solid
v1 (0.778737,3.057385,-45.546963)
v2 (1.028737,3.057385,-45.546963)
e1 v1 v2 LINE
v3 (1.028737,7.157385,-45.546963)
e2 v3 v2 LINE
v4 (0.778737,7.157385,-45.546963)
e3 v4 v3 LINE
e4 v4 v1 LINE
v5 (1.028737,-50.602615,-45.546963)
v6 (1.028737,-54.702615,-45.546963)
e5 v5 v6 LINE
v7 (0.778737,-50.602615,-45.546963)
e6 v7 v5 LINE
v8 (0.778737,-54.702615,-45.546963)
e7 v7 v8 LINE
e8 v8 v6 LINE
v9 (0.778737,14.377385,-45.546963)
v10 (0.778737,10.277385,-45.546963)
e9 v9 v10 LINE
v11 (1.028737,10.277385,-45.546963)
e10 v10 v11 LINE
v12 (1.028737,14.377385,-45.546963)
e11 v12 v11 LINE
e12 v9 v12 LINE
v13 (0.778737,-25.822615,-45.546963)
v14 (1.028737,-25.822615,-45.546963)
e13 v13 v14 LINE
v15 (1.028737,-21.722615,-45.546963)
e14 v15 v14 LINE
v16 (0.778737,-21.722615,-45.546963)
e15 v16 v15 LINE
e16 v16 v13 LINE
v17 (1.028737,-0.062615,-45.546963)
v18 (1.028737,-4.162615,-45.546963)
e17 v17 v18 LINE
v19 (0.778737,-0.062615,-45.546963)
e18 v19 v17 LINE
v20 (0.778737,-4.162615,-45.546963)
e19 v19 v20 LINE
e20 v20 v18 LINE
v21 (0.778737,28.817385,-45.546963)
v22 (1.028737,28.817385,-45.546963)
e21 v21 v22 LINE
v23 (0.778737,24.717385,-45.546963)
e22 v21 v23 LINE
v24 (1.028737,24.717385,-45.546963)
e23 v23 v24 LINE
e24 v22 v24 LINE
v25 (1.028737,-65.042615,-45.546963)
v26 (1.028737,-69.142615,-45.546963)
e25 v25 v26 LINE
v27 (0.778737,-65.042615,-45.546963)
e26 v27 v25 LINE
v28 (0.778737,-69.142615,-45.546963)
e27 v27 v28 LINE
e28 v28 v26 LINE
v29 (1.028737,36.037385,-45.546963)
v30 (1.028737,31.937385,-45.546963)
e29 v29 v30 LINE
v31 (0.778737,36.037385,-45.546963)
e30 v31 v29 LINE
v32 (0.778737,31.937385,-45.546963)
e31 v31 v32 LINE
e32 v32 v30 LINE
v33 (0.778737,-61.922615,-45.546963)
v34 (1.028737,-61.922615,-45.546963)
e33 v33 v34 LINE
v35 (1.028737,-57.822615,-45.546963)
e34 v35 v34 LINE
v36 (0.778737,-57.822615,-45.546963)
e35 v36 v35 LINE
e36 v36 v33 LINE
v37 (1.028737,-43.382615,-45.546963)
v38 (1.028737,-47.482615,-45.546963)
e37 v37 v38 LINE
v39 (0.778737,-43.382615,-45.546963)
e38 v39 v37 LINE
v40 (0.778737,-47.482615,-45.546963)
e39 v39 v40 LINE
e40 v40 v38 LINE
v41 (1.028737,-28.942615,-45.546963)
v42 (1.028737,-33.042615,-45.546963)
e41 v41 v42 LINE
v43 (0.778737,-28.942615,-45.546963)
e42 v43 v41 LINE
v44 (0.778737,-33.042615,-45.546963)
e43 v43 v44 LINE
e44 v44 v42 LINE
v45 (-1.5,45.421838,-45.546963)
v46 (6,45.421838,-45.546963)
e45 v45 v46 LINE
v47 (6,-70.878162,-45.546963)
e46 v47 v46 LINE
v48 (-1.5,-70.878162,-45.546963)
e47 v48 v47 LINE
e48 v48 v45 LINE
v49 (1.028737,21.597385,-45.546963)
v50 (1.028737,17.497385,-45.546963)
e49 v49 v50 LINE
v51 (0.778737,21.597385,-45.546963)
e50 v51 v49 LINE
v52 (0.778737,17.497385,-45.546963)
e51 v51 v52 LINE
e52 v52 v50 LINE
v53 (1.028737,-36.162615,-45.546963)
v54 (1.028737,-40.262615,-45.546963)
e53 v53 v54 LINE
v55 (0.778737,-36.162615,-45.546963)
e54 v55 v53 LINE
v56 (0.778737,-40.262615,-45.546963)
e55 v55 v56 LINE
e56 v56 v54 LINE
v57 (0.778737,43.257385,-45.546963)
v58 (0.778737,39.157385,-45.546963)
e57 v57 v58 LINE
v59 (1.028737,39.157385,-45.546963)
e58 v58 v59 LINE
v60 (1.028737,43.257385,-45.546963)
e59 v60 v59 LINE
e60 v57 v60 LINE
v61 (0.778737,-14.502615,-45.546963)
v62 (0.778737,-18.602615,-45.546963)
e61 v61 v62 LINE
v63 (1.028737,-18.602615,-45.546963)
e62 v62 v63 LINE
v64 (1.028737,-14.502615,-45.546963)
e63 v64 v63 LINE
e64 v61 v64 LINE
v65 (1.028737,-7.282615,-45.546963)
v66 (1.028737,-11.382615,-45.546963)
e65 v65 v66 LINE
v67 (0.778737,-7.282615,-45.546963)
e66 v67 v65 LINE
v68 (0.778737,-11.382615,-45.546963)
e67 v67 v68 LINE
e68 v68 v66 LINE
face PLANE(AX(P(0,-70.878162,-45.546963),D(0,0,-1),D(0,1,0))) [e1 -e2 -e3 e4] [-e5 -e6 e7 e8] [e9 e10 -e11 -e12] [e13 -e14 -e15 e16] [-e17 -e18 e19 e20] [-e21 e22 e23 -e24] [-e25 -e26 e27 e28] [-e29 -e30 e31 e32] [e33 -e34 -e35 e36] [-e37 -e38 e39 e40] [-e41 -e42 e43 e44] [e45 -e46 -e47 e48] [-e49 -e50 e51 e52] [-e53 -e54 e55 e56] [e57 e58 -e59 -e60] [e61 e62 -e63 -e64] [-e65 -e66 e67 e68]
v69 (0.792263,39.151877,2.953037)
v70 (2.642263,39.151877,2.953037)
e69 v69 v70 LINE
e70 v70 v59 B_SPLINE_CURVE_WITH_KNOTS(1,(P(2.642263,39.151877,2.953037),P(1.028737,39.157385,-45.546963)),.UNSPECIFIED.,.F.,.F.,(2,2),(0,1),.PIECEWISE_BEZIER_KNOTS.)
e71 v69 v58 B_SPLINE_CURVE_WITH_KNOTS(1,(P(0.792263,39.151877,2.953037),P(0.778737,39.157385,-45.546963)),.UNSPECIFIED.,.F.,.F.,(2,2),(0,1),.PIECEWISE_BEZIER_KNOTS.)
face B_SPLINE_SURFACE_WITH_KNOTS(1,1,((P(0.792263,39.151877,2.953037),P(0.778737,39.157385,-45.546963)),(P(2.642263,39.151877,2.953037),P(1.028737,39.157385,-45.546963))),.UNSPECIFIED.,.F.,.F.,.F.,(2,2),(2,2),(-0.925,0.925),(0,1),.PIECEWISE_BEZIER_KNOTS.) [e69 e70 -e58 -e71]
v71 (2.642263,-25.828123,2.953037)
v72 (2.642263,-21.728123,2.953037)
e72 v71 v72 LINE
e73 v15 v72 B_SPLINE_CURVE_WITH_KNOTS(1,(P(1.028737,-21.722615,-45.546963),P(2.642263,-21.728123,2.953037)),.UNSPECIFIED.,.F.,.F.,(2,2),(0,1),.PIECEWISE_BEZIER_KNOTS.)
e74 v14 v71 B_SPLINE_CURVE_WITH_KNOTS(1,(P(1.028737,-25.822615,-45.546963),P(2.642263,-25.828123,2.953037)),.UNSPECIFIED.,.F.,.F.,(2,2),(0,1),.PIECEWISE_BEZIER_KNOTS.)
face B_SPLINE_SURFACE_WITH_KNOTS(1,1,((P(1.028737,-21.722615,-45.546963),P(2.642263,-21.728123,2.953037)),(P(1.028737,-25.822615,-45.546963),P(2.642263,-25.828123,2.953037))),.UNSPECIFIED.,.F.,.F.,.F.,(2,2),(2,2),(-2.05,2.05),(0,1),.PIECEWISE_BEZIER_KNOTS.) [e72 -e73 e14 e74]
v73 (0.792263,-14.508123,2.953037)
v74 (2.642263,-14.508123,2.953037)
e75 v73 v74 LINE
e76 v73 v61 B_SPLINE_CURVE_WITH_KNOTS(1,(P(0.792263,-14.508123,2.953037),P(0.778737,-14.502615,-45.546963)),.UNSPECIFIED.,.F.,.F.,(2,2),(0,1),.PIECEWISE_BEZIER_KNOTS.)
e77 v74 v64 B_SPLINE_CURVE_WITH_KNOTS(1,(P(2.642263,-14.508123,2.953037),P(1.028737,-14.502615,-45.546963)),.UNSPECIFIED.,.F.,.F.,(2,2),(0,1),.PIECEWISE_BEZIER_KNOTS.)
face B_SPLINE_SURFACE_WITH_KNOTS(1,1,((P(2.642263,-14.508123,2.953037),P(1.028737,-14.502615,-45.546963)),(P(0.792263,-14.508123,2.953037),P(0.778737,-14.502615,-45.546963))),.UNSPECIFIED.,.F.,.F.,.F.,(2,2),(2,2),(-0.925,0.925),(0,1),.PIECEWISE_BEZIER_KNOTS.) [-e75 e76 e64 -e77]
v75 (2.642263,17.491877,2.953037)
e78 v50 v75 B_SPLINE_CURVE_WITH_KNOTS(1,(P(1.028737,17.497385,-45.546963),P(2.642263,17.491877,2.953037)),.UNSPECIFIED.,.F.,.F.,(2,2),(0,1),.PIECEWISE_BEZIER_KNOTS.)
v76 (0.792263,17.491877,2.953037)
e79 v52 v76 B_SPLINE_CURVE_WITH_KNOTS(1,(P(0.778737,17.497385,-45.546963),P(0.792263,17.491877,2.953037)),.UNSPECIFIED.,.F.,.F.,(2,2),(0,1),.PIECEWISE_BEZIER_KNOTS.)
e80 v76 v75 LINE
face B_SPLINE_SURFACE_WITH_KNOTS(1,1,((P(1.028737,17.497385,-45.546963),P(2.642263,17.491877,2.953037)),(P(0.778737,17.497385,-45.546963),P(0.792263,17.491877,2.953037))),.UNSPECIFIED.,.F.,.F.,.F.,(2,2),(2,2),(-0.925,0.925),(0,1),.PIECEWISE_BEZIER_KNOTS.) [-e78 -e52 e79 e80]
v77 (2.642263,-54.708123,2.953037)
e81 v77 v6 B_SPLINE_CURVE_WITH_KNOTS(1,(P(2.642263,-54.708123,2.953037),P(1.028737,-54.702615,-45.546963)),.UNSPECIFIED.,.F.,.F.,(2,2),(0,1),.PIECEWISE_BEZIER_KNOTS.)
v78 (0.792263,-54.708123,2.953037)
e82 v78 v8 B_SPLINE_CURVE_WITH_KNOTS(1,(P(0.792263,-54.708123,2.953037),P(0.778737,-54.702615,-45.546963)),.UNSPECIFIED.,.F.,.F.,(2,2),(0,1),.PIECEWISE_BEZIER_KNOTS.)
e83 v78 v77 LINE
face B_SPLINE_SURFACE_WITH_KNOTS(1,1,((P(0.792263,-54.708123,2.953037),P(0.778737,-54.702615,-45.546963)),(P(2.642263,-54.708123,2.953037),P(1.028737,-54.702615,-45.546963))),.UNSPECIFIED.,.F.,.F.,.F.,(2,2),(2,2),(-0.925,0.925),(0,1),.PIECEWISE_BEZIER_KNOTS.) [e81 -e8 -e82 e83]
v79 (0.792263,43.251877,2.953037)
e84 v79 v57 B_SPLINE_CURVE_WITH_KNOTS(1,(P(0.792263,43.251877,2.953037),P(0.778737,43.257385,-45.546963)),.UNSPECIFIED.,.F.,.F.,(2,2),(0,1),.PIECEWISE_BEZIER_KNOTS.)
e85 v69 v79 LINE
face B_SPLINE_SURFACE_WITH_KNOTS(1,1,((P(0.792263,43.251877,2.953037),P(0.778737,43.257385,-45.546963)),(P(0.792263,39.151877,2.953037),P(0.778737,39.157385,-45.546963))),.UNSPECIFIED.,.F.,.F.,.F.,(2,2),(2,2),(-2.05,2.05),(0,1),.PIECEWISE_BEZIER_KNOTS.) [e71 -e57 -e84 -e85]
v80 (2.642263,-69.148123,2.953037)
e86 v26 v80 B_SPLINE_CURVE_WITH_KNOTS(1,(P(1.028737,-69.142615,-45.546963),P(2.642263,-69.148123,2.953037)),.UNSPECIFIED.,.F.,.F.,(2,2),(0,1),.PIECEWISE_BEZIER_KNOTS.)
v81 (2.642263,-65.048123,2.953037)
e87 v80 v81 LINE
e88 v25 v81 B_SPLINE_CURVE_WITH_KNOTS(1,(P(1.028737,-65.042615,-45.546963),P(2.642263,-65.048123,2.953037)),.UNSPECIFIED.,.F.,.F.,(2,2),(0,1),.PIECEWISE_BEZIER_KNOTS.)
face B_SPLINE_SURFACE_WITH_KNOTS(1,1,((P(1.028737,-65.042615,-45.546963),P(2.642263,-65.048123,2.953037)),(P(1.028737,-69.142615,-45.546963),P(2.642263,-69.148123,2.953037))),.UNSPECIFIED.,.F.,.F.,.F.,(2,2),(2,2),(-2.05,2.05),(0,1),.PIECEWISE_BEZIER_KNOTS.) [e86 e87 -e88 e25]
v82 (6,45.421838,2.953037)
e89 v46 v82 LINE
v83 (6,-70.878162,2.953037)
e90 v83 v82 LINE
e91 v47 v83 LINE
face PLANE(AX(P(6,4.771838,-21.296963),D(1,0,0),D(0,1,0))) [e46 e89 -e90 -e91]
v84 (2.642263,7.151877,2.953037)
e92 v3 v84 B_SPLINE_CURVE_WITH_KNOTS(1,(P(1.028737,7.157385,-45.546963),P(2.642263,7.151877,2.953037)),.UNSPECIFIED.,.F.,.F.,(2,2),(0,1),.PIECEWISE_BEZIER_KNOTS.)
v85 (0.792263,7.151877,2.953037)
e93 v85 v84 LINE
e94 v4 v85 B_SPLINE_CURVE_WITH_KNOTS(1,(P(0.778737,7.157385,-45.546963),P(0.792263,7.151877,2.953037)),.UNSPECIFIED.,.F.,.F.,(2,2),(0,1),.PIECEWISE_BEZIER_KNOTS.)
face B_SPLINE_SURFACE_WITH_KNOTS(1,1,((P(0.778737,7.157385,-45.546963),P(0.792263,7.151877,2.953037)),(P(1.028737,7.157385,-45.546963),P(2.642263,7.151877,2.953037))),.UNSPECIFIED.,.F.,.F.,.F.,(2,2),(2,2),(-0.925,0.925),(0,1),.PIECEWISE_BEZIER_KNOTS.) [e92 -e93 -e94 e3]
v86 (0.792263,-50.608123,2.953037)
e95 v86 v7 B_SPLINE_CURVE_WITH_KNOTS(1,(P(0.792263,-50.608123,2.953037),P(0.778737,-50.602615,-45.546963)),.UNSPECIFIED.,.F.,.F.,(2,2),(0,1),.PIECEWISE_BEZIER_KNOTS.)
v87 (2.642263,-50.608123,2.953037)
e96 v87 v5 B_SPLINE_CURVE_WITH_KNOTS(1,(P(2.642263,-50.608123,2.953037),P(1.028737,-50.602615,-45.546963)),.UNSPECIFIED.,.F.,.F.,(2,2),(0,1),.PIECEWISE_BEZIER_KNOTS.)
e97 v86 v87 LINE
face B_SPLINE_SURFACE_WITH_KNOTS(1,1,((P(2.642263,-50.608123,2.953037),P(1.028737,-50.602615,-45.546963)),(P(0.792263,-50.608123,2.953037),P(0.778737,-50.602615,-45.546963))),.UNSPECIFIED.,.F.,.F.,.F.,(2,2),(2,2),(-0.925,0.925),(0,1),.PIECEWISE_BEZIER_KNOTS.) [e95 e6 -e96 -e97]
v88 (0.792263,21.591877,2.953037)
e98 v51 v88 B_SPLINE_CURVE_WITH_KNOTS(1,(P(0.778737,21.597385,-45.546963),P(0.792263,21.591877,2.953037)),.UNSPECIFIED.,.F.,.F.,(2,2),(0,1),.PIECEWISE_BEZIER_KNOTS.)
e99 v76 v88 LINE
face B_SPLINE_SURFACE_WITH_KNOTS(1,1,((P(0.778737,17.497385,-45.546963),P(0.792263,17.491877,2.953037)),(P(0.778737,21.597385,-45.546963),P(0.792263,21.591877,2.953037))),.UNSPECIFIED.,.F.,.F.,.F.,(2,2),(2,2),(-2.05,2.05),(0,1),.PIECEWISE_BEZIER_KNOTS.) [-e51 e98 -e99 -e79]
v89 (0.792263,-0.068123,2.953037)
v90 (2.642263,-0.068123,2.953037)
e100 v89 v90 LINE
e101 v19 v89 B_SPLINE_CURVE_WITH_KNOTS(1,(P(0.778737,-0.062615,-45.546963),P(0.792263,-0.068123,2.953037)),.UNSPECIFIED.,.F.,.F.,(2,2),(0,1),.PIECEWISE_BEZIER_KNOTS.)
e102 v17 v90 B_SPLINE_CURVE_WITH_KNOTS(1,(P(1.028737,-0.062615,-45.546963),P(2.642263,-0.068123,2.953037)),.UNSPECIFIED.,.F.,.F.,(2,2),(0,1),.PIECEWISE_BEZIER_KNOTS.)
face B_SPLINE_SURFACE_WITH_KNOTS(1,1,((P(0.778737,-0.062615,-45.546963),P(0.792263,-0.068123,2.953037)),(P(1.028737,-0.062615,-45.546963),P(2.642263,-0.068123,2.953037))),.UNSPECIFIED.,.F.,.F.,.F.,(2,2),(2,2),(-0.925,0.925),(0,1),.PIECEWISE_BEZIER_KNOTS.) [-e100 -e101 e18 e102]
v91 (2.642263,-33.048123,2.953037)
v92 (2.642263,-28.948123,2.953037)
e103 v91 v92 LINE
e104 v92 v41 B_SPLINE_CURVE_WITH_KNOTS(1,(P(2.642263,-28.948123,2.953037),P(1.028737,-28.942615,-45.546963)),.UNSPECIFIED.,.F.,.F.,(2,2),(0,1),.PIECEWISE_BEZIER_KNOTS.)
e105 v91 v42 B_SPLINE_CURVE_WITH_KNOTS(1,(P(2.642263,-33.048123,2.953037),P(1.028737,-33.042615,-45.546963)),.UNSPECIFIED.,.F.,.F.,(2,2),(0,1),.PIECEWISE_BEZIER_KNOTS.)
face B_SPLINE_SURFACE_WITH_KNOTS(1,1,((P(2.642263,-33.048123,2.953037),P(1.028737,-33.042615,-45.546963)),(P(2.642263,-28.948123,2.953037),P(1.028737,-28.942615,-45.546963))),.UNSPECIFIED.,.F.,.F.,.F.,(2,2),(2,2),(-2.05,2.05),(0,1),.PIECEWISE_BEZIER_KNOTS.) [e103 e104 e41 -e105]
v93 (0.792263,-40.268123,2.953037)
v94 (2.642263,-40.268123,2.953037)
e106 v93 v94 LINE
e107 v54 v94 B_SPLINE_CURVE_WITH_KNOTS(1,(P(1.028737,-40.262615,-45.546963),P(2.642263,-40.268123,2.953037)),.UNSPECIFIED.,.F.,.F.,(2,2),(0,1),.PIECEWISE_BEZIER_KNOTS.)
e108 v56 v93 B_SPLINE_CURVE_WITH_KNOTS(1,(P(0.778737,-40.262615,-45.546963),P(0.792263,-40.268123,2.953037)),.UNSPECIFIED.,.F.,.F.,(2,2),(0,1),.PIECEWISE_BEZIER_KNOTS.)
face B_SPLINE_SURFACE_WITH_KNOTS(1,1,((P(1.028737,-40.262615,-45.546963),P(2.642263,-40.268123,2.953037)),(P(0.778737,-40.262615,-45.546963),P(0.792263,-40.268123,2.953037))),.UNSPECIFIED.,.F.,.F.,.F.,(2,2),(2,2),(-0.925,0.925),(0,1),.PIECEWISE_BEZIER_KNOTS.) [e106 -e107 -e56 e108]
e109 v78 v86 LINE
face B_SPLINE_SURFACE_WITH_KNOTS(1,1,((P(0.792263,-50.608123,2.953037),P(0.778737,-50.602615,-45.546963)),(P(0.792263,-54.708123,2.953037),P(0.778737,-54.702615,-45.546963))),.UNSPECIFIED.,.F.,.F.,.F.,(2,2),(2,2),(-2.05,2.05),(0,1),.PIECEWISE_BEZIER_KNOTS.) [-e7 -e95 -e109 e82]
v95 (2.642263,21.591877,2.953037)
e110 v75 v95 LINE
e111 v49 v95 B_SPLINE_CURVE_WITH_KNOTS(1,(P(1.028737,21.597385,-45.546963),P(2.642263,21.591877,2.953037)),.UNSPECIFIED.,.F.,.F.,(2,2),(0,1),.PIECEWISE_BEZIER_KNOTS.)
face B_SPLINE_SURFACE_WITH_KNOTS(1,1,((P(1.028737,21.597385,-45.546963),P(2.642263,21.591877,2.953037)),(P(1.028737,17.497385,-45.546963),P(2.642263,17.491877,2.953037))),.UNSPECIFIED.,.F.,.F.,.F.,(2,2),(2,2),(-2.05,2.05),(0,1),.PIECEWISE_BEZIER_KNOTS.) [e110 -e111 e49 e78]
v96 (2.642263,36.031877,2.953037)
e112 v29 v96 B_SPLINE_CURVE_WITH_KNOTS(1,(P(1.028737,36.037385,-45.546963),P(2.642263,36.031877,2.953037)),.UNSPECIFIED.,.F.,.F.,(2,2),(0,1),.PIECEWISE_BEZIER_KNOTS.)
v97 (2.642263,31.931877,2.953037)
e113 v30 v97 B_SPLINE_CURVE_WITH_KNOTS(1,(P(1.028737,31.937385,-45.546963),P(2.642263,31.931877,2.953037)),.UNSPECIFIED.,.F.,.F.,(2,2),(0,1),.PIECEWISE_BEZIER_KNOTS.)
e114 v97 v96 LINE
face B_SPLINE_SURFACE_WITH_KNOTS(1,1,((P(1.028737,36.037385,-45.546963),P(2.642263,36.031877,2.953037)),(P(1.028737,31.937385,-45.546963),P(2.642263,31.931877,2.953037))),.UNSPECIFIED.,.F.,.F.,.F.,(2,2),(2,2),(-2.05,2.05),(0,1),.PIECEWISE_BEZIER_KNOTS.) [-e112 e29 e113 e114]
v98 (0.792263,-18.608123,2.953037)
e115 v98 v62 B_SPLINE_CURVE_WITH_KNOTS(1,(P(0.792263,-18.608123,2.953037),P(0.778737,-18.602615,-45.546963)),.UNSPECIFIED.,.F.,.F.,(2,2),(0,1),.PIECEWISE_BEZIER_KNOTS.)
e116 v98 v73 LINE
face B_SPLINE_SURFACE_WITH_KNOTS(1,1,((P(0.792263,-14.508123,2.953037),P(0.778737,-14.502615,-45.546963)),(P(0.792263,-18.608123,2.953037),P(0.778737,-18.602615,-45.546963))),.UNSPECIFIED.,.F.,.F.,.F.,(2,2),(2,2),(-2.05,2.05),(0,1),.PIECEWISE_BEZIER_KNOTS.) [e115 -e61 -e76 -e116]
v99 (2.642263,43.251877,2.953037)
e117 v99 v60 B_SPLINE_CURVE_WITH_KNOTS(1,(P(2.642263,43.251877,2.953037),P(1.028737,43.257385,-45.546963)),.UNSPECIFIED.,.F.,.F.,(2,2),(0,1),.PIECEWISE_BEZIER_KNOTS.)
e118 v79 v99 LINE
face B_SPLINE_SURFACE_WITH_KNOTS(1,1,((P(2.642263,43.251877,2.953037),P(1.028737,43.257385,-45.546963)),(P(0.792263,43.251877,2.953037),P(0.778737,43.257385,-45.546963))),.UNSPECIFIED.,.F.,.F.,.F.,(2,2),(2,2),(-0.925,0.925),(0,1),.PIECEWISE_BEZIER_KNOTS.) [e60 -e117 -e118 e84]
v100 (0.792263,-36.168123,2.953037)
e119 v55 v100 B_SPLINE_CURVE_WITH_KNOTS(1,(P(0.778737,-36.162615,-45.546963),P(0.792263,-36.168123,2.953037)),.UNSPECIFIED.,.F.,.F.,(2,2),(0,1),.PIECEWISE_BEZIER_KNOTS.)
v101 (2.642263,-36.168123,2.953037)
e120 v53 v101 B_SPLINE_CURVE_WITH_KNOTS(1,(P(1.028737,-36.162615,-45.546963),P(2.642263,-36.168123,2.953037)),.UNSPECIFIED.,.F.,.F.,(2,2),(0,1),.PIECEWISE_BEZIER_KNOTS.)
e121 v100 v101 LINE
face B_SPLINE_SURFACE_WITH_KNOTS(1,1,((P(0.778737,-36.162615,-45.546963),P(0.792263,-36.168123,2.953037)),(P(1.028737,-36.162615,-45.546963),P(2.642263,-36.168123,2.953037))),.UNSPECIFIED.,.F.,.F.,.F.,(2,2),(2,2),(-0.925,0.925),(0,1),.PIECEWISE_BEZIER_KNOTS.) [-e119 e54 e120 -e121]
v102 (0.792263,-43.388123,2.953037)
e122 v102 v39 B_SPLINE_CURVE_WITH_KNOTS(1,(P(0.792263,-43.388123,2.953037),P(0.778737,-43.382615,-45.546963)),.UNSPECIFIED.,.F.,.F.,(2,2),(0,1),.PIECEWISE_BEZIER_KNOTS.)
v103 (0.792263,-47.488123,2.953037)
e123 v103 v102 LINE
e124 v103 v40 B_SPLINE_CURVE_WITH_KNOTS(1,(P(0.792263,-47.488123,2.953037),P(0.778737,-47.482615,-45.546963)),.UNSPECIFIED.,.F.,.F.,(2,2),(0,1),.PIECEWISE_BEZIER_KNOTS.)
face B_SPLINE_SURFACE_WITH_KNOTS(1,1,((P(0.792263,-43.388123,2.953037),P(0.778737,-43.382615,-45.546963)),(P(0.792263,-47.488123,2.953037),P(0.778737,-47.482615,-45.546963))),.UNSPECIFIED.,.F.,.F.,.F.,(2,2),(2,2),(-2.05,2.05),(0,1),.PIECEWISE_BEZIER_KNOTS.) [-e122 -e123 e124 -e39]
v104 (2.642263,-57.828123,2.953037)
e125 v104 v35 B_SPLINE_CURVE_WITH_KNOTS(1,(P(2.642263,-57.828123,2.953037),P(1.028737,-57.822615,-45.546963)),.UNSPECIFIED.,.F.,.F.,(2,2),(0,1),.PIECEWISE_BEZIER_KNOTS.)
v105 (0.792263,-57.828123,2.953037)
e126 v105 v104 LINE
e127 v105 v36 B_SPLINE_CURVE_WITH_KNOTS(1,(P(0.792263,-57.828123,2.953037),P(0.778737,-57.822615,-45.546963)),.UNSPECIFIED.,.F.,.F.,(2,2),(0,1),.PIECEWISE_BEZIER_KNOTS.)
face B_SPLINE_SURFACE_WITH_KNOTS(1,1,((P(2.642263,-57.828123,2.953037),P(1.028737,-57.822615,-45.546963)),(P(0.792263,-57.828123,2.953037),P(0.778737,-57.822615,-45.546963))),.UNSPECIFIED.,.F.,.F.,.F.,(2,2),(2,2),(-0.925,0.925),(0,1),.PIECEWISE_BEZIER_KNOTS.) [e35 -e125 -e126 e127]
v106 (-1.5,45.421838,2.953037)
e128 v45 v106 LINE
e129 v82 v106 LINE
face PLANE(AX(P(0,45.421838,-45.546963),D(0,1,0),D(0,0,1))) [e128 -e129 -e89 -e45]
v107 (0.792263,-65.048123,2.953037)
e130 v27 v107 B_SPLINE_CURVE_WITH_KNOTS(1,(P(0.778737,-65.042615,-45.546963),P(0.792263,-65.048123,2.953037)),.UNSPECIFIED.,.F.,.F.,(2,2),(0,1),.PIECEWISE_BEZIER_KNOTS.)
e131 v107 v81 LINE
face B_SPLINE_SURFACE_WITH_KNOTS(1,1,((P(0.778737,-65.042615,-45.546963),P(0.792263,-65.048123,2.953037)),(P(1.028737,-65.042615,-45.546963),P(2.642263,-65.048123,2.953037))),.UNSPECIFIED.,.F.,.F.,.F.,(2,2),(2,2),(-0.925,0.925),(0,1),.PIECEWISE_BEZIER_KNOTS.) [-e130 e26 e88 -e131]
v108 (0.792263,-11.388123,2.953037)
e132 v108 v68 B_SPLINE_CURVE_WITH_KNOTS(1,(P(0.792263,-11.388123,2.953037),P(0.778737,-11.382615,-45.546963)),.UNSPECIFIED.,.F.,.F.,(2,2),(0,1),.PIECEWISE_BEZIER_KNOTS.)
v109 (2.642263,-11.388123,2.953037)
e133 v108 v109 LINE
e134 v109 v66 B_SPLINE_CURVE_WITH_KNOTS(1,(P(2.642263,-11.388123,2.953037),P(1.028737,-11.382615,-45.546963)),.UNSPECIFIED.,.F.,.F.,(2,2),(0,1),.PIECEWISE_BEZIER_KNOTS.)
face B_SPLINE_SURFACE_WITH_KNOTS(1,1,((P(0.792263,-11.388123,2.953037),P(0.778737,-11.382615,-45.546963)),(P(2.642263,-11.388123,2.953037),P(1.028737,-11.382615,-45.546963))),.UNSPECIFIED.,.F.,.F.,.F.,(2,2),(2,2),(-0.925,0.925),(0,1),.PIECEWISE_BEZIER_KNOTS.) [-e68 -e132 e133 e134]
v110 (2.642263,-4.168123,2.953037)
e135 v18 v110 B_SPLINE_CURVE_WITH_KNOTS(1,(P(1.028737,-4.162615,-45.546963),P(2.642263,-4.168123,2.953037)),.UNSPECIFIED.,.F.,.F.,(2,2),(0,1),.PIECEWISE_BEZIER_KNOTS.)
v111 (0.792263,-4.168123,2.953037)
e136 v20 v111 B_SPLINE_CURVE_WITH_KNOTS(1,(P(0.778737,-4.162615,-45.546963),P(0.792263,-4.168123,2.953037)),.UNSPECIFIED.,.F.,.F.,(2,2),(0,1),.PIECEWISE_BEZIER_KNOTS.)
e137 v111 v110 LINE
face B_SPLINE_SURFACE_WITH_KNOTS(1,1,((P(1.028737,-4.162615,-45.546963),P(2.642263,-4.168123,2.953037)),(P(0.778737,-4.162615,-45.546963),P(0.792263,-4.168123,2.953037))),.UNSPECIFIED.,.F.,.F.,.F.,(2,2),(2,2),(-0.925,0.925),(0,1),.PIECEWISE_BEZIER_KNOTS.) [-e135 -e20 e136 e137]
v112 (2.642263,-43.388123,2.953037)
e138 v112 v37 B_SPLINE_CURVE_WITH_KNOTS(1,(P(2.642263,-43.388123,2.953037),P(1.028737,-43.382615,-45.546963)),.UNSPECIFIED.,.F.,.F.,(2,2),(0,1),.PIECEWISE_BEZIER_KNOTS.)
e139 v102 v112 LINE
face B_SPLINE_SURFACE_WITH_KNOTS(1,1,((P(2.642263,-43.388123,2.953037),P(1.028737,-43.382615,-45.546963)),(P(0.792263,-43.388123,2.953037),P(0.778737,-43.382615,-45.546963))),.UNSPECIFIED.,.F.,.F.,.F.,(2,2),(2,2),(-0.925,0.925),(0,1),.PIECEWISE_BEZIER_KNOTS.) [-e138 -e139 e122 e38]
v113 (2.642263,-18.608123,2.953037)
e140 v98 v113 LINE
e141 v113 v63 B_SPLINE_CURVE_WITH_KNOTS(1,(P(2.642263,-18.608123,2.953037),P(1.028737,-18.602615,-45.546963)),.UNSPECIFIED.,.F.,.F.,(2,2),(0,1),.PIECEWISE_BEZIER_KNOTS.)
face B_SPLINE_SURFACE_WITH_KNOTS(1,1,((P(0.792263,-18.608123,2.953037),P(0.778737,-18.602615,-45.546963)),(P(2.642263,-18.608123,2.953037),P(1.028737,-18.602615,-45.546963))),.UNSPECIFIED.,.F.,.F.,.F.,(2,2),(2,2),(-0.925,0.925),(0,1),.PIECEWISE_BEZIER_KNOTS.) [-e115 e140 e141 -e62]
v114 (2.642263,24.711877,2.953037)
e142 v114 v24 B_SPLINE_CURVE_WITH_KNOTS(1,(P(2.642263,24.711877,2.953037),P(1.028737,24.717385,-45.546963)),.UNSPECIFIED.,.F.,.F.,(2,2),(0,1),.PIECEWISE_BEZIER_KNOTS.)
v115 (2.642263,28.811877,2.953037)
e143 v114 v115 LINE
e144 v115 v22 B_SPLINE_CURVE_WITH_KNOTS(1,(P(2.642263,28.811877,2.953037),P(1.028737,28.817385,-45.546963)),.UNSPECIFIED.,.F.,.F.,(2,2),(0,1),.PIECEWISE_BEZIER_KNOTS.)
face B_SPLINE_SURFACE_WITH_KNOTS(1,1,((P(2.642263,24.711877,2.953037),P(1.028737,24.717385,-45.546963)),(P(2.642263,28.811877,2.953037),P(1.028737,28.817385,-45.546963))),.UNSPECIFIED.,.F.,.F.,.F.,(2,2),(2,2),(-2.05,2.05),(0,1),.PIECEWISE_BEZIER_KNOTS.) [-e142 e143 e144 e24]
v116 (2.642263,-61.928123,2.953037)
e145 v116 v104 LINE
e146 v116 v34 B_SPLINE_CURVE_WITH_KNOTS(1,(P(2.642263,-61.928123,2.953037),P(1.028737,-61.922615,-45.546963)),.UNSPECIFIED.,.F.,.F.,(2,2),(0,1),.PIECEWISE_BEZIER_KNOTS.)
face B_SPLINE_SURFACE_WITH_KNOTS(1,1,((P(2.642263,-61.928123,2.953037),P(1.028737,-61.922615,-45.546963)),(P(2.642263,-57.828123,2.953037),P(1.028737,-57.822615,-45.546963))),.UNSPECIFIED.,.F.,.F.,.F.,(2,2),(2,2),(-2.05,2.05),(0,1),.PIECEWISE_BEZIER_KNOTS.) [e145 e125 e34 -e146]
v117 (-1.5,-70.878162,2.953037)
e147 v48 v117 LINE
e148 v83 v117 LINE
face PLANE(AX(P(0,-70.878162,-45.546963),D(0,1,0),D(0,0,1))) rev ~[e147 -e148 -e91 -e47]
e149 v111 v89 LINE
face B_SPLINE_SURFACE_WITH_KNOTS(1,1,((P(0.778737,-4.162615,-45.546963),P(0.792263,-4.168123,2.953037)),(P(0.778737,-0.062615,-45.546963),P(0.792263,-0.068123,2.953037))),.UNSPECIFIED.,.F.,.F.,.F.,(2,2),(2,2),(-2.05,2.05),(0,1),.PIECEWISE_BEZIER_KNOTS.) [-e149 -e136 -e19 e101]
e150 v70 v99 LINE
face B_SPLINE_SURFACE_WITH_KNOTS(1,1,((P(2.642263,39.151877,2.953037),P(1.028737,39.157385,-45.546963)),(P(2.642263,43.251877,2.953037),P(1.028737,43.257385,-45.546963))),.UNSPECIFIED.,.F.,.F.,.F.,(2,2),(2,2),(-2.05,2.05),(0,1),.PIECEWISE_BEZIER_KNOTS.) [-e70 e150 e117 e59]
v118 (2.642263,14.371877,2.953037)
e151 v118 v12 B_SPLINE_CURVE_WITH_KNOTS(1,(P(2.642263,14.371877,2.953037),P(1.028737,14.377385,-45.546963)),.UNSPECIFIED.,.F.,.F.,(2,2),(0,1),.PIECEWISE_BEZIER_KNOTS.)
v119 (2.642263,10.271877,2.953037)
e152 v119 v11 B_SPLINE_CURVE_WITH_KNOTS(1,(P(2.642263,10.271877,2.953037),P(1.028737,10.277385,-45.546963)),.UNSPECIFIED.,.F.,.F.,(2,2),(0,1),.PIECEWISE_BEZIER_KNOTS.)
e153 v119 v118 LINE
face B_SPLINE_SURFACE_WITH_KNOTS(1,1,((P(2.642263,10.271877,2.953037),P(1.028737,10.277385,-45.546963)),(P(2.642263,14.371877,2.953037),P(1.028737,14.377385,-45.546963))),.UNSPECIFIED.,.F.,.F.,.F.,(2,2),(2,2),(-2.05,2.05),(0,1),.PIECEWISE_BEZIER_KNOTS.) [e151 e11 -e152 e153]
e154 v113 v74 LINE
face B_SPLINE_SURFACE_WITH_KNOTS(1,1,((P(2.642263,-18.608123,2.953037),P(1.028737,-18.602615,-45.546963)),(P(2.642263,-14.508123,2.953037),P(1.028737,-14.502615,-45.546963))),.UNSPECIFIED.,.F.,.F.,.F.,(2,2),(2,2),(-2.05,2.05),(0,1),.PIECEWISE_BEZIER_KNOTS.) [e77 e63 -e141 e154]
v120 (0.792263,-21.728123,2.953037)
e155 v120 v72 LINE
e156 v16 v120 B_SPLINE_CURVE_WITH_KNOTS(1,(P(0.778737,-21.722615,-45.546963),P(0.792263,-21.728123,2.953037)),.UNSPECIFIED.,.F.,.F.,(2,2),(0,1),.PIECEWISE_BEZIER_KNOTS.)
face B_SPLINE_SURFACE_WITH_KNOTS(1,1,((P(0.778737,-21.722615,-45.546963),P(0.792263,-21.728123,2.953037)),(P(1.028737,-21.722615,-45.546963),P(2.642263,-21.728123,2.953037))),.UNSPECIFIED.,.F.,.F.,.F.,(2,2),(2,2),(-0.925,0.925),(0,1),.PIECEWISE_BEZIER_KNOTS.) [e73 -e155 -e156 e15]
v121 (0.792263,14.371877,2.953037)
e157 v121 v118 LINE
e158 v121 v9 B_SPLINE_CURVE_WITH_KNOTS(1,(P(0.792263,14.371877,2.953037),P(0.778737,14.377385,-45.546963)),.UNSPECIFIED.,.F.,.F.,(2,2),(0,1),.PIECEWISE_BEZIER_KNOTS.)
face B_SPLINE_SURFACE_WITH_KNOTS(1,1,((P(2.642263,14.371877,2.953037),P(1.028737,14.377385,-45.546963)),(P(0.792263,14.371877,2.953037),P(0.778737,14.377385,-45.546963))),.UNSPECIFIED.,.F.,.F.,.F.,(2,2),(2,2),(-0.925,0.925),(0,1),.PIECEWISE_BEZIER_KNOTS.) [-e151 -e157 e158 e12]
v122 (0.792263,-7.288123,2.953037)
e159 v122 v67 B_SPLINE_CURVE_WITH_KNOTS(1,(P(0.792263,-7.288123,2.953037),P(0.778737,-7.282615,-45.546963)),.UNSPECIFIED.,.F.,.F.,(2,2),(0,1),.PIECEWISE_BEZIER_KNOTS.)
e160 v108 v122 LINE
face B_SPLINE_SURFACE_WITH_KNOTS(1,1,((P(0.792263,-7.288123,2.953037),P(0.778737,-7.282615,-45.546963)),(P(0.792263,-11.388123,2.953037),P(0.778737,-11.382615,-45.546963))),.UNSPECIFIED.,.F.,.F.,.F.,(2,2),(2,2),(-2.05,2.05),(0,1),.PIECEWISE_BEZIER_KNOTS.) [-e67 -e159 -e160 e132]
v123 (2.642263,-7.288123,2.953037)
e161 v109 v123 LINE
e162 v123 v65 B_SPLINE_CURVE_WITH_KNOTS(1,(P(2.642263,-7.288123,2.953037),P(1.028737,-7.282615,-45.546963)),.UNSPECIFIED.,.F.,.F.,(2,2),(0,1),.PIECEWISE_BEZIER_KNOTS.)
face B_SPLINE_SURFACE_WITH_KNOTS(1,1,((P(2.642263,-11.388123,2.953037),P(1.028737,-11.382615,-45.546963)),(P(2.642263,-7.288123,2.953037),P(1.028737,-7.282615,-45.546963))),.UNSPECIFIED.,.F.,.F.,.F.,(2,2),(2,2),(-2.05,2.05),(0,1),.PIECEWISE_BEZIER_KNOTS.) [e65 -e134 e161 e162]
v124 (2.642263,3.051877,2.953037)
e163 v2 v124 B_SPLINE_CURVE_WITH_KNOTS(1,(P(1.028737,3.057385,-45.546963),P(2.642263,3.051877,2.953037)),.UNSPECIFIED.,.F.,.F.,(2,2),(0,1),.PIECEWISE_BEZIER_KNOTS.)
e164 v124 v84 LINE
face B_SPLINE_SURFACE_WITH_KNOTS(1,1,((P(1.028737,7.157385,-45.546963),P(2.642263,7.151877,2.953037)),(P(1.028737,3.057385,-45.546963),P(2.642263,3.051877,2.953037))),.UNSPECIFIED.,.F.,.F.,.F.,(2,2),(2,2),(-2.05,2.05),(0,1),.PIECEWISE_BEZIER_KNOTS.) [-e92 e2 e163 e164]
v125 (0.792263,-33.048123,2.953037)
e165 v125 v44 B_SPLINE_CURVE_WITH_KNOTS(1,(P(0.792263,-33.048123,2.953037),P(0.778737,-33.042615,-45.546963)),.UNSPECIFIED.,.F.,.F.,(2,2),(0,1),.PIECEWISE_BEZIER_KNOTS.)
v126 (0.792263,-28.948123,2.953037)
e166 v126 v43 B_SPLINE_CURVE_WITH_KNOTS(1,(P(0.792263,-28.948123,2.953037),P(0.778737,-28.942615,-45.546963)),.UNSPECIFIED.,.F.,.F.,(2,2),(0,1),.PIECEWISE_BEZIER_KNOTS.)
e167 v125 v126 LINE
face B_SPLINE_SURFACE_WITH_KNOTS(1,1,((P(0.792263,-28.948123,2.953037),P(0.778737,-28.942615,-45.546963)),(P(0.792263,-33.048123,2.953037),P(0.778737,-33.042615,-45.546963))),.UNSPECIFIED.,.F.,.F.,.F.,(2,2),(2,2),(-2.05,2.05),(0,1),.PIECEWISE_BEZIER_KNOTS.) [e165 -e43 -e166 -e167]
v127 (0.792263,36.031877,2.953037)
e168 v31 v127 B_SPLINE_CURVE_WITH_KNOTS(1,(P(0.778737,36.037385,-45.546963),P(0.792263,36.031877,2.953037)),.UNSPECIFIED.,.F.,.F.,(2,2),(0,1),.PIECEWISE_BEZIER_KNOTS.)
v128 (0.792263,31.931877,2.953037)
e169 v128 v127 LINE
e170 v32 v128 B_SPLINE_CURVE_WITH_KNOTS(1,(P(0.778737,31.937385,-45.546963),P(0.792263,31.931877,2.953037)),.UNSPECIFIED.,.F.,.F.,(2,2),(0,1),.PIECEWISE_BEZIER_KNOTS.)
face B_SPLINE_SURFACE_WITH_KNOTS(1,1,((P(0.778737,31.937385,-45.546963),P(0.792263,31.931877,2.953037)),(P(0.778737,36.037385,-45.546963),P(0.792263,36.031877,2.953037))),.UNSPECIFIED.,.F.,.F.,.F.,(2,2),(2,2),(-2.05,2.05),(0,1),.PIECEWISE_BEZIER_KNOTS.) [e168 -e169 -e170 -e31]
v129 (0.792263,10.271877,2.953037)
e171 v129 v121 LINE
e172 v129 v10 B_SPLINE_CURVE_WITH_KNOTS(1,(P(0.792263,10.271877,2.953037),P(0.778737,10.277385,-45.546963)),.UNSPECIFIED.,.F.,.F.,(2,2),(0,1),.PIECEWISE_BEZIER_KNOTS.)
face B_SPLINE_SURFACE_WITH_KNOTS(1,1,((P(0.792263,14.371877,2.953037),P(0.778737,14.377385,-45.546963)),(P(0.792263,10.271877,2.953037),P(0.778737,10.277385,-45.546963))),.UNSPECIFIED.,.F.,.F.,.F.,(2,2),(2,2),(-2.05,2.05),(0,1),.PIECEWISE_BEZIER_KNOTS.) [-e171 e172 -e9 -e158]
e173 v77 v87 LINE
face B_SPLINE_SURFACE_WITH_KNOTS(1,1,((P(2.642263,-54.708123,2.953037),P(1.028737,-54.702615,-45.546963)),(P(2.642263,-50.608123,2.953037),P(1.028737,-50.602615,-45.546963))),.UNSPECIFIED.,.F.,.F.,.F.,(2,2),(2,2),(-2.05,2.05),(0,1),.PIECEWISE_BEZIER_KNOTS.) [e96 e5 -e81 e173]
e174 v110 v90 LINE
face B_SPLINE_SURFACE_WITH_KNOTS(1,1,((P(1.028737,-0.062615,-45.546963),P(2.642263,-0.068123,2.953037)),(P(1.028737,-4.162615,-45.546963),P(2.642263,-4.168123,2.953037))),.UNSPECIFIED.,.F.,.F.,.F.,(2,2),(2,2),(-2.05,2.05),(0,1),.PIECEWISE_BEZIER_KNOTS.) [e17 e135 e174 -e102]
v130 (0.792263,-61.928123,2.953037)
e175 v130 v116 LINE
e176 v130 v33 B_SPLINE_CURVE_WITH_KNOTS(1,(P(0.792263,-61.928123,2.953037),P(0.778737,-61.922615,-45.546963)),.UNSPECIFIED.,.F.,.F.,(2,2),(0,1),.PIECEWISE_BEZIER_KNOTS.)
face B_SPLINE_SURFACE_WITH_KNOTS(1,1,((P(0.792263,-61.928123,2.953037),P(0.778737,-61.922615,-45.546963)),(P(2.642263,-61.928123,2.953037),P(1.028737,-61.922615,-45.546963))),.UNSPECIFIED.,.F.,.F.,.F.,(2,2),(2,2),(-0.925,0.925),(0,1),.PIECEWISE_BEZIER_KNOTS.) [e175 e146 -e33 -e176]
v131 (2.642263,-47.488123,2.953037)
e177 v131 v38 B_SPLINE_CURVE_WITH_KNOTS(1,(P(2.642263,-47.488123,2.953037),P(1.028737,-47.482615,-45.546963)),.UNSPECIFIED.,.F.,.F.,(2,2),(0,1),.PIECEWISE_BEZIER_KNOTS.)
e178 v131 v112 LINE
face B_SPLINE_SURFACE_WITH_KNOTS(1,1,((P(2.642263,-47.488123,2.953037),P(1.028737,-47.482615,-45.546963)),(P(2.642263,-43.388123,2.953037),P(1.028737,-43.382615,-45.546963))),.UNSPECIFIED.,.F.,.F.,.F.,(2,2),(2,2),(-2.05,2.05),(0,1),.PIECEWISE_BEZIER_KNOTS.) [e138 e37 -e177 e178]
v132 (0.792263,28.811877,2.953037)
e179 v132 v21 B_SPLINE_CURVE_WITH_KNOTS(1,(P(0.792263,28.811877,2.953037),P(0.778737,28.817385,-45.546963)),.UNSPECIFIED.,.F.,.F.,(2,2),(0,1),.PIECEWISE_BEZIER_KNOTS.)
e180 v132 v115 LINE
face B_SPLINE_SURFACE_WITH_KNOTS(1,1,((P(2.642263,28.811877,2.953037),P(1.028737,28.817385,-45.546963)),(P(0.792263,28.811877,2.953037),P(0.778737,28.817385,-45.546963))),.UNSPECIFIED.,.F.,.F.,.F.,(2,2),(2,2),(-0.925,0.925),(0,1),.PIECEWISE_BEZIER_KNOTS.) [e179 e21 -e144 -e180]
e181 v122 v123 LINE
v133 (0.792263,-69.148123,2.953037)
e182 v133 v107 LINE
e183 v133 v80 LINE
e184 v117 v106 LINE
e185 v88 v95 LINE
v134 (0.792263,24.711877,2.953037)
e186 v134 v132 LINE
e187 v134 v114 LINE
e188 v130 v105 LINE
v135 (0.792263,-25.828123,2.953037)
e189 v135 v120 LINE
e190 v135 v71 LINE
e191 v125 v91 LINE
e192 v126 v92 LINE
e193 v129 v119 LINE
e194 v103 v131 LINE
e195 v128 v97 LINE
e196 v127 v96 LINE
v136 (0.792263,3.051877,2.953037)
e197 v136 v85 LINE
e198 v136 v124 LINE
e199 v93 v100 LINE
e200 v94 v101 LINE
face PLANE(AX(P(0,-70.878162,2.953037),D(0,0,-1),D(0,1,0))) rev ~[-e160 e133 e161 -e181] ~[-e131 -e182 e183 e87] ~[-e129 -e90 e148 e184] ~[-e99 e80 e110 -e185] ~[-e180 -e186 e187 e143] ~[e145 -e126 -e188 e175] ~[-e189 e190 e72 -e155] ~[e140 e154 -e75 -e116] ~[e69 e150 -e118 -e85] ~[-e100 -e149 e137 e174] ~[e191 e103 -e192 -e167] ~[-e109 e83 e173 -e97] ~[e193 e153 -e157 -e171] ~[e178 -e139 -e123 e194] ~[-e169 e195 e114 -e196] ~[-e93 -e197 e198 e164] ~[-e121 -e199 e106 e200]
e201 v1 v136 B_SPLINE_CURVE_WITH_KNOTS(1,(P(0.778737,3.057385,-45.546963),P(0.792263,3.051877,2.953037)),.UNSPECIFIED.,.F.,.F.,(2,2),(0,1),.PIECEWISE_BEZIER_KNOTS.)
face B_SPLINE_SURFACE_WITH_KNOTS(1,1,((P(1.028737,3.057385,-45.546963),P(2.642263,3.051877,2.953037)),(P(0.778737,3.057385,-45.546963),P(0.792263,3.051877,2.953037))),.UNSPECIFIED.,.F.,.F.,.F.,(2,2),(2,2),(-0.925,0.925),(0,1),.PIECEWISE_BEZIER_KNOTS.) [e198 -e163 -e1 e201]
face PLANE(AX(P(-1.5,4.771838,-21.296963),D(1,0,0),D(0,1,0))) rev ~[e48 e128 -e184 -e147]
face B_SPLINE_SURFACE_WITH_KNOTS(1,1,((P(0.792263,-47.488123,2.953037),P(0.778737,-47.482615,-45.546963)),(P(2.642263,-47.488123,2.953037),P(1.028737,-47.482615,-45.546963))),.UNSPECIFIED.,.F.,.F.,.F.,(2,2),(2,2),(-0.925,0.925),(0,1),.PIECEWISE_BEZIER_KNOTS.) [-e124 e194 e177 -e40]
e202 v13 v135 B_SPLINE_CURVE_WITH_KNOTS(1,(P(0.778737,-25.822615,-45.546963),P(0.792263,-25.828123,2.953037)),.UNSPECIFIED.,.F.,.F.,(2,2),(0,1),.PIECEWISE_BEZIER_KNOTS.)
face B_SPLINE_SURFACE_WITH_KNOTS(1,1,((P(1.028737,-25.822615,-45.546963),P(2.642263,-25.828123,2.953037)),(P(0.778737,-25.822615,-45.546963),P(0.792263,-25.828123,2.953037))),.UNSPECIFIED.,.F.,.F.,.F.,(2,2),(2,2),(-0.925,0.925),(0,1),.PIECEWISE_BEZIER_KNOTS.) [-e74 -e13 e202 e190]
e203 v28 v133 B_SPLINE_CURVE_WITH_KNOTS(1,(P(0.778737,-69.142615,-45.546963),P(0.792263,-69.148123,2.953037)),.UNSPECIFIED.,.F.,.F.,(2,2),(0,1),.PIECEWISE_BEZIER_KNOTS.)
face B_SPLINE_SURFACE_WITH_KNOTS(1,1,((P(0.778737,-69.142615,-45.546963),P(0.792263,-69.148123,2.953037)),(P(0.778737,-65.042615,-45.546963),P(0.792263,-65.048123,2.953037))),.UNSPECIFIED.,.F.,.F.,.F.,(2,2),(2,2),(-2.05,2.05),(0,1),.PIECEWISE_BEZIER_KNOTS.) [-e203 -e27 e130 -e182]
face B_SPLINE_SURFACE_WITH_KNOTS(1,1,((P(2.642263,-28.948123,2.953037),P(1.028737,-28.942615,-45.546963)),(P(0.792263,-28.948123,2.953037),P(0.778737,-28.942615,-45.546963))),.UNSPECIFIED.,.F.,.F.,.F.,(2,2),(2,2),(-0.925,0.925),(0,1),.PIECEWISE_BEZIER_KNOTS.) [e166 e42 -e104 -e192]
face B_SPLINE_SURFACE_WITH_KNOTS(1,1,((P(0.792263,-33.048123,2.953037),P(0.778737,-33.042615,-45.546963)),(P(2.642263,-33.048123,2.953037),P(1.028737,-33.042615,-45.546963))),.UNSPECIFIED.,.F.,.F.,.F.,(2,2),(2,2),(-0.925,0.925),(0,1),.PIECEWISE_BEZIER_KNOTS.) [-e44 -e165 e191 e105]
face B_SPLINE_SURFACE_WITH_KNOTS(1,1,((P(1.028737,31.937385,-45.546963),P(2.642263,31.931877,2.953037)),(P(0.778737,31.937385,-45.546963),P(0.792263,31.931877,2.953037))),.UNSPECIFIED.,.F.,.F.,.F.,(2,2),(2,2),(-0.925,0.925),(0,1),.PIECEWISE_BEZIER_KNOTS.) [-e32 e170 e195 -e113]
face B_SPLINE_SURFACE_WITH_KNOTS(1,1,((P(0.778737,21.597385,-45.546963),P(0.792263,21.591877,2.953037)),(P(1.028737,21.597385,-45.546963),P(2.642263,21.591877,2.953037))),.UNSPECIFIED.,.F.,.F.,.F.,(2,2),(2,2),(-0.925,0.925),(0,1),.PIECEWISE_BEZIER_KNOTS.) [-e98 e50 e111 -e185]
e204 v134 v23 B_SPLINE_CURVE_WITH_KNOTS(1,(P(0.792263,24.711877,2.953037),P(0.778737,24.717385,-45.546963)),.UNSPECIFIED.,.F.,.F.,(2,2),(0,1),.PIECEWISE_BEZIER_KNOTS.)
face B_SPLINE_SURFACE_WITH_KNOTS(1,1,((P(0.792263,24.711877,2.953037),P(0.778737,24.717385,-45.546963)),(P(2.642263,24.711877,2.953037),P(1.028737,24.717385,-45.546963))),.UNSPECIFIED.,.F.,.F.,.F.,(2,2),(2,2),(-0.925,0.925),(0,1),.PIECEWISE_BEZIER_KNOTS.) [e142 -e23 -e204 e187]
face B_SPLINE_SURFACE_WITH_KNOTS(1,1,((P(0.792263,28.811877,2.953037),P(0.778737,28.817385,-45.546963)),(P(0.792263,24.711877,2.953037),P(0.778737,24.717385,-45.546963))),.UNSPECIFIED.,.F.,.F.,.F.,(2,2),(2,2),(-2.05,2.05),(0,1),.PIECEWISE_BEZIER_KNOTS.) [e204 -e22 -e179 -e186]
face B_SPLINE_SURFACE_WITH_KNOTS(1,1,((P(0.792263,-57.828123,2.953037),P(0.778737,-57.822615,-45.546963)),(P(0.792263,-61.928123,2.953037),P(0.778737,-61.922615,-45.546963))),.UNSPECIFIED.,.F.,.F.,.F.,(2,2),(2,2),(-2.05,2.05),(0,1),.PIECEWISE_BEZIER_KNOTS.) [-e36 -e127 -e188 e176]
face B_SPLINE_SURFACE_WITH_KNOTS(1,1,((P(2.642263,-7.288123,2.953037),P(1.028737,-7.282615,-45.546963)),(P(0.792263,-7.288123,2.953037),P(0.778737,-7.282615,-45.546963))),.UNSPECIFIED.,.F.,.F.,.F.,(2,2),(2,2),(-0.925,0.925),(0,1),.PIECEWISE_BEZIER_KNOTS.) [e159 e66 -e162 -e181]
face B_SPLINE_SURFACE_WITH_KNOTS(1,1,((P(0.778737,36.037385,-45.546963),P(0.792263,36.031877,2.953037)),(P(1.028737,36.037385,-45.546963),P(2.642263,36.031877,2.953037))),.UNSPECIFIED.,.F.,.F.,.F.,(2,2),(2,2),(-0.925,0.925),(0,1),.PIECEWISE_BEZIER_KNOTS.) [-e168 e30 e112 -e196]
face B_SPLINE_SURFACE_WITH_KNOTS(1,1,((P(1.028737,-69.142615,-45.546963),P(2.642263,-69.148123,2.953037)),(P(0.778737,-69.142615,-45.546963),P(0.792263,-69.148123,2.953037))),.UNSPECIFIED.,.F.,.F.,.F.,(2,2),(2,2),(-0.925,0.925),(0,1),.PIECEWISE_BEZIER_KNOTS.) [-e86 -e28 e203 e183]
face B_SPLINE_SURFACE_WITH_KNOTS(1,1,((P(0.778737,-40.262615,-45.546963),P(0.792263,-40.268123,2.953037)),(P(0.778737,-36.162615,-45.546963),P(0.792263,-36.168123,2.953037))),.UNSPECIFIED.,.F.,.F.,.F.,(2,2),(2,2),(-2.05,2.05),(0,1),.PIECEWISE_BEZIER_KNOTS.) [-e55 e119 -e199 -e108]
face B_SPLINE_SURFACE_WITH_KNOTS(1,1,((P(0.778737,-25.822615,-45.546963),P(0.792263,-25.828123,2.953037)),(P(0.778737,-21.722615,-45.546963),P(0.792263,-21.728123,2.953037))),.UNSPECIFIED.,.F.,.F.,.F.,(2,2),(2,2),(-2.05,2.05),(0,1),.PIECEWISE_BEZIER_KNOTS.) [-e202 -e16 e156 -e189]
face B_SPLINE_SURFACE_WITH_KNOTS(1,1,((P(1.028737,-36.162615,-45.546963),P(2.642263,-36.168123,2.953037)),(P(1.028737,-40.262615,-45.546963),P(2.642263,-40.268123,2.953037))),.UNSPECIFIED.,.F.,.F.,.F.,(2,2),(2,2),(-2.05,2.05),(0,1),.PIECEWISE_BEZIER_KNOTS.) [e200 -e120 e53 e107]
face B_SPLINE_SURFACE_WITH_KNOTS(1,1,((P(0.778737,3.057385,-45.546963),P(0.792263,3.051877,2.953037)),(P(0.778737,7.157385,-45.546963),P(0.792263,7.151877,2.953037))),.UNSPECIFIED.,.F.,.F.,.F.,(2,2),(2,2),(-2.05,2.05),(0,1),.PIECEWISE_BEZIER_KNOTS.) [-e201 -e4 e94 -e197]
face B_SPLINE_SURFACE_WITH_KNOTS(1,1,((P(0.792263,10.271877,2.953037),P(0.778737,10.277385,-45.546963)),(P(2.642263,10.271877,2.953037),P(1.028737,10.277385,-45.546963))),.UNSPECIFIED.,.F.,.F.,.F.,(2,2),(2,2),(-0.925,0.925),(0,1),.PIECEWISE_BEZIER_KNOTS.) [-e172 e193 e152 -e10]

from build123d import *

# Parameters (mm, degrees)
F0_W      = 151.3
F0_H      = 48.5
F1_DEPTH  = 8
F2_W      = 1.85
F2_H      = 4.1
F3_W      = 0.25
F3_H      = 4.1
F22_DEPTH = 1.5
F23_DEPTH = 2
F24_DEPTH = 35


with BuildPart() as f1:
    # F0 (on Right) → F1 (new body)
    with BuildSketch(Plane.YZ):
        with Locations((4.7718379647, -21.296962655)):
            Rectangle(F0_W, F0_H)
    extrude(amount=F1_DEPTH)

    # F2 (on face) → F4 section 0
    with BuildSketch(Plane.XY.offset(2.953037345)):
        with Locations((1.7172626683, -67.0981232643)):
            Rectangle(F2_W, F2_H)
    # F3 (on face) → F4 section 1
    with BuildSketch(Plane(origin=(0, 0, -45.546962655), x_dir=(1, 0, 0), z_dir=(0, 0, -1))):
        with Locations((0.9037374025, 67.0926149368)):
            Rectangle(F3_W, F3_H)
    loft()

    # F3 (on face) → F5 section 0
    with BuildSketch(Plane(origin=(0, 0, -45.546962655), x_dir=(1, 0, 0), z_dir=(0, 0, -1))):
        with Locations((0.9037374025, 67.0926149368)):
            Rectangle(F3_W, F3_H)
    # F2 (on face) → F5 section 1
    with BuildSketch(Plane.XY.offset(2.953037345)):
        with Locations((1.7172626683, -67.0981232643)):
            Rectangle(F2_W, F2_H)
    loft(mode=Mode.SUBTRACT)

    # F2 (on face) → F6 section 0
    with BuildSketch(Plane.XY.offset(2.953037345)):
        with Locations((1.7172626683, -59.8781232643)):
            Rectangle(F2_W, F2_H)
    # F3 (on face) → F6 section 1
    with BuildSketch(Plane(origin=(0, 0, -45.546962655), x_dir=(1, 0, 0), z_dir=(0, 0, -1))):
        with Locations((0.9037374025, 59.8726149368)):
            Rectangle(F3_W, F3_H)
    loft(mode=Mode.SUBTRACT)

    # F2 (on face) → F7 section 0
    with BuildSketch(Plane.XY.offset(2.953037345)):
        with Locations((1.7172626683, -52.6581232643)):
            Rectangle(F2_W, F2_H)
    # F3 (on face) → F7 section 1
    with BuildSketch(Plane(origin=(0, 0, -45.546962655), x_dir=(1, 0, 0), z_dir=(0, 0, -1))):
        with Locations((0.9037374025, 52.6526149368)):
            Rectangle(F3_W, F3_H)
    loft(mode=Mode.SUBTRACT)

    # F2 (on face) → F8 section 0
    with BuildSketch(Plane.XY.offset(2.953037345)):
        with Locations((1.7172626683, -45.4381232643)):
            Rectangle(F2_W, F2_H)
    # F3 (on face) → F8 section 1
    with BuildSketch(Plane(origin=(0, 0, -45.546962655), x_dir=(1, 0, 0), z_dir=(0, 0, -1))):
        with Locations((0.9037374025, 45.4326149368)):
            Rectangle(F3_W, F3_H)
    loft(mode=Mode.SUBTRACT)

    # F3 (on face) → F9 section 0
    with BuildSketch(Plane(origin=(0, 0, -45.546962655), x_dir=(1, 0, 0), z_dir=(0, 0, -1))):
        with Locations((0.9037374025, 38.2126149368)):
            Rectangle(F3_W, F3_H)
    # F2 (on face) → F9 section 1
    with BuildSketch(Plane.XY.offset(2.953037345)):
        with Locations((1.7172626683, -38.2181232643)):
            Rectangle(F2_W, F2_H)
    loft(mode=Mode.SUBTRACT)

    # F2 (on face) → F10 section 0
    with BuildSketch(Plane.XY.offset(2.953037345)):
        with Locations((1.7172626683, -30.9981232643)):
            Rectangle(F2_W, F2_H)
    # F3 (on face) → F10 section 1
    with BuildSketch(Plane(origin=(0, 0, -45.546962655), x_dir=(1, 0, 0), z_dir=(0, 0, -1))):
        with Locations((0.9037374025, 30.9926149368)):
            Rectangle(F3_W, F3_H)
    loft(mode=Mode.SUBTRACT)

    # F3 (on face) → F11 section 0
    with BuildSketch(Plane(origin=(0, 0, -45.546962655), x_dir=(1, 0, 0), z_dir=(0, 0, -1))):
        with Locations((0.9037374025, 23.7726149368)):
            Rectangle(F3_W, F3_H)
    # F2 (on face) → F11 section 1
    with BuildSketch(Plane.XY.offset(2.953037345)):
        with Locations((1.7172626683, -23.7781232643)):
            Rectangle(F2_W, F2_H)
    loft(mode=Mode.SUBTRACT)

    # F2 (on face) → F12 section 0
    with BuildSketch(Plane.XY.offset(2.953037345)):
        with Locations((1.7172626683, -16.5581232643)):
            Rectangle(F2_W, F2_H)
    # F3 (on face) → F12 section 1
    with BuildSketch(Plane(origin=(0, 0, -45.546962655), x_dir=(1, 0, 0), z_dir=(0, 0, -1))):
        with Locations((0.9037374025, 16.5526149368)):
            Rectangle(F3_W, F3_H)
    loft()

    # F2 (on face) → F13 section 0
    with BuildSketch(Plane.XY.offset(2.953037345)):
        with Locations((1.7172626683, -16.5581232643)):
            Rectangle(F2_W, F2_H)
    # F3 (on face) → F13 section 1
    with BuildSketch(Plane(origin=(0, 0, -45.546962655), x_dir=(1, 0, 0), z_dir=(0, 0, -1))):
        with Locations((0.9037374025, 16.5526149368)):
            Rectangle(F3_W, F3_H)
    loft(mode=Mode.SUBTRACT)

    # F2 (on face) → F14 section 0
    with BuildSketch(Plane.XY.offset(2.953037345)):
        with Locations((1.7172626683, -9.3381232643)):
            Rectangle(F2_W, F2_H)
    # F3 (on face) → F14 section 1
    with BuildSketch(Plane(origin=(0, 0, -45.546962655), x_dir=(1, 0, 0), z_dir=(0, 0, -1))):
        with Locations((0.9037374025, 9.3326149368)):
            Rectangle(F3_W, F3_H)
    loft(mode=Mode.SUBTRACT)

    # F3 (on face) → F15 section 0
    with BuildSketch(Plane(origin=(0, 0, -45.546962655), x_dir=(1, 0, 0), z_dir=(0, 0, -1))):
        with Locations((0.9037374025, 2.1126149368)):
            Rectangle(F3_W, F3_H)
    # F2 (on face) → F15 section 1
    with BuildSketch(Plane.XY.offset(2.953037345)):
        with Locations((1.7172626683, -2.1181232643)):
            Rectangle(F2_W, F2_H)
    loft(mode=Mode.SUBTRACT)

    # F3 (on face) → F16 section 0
    with BuildSketch(Plane(origin=(0, 0, -45.546962655), x_dir=(1, 0, 0), z_dir=(0, 0, -1))):
        with Locations((0.9037374025, -5.1073850632)):
            Rectangle(F3_W, F3_H)
    # F2 (on face) → F16 section 1
    with BuildSketch(Plane.XY.offset(2.953037345)):
        with Locations((1.7172626683, 5.1018767357)):
            Rectangle(F2_W, F2_H)
    loft(mode=Mode.SUBTRACT)

    # F2 (on face) → F17 section 0
    with BuildSketch(Plane.XY.offset(2.953037345)):
        with Locations((1.7172626683, 12.3218767357)):
            Rectangle(F2_W, F2_H)
    # F3 (on face) → F17 section 1
    with BuildSketch(Plane(origin=(0, 0, -45.546962655), x_dir=(1, 0, 0), z_dir=(0, 0, -1))):
        with Locations((0.9037374025, -12.3273850632)):
            Rectangle(F3_W, F3_H)
    loft(mode=Mode.SUBTRACT)

    # F3 (on face) → F18 section 0
    with BuildSketch(Plane(origin=(0, 0, -45.546962655), x_dir=(1, 0, 0), z_dir=(0, 0, -1))):
        with Locations((0.9037374025, -19.5473850632)):
            Rectangle(F3_W, F3_H)
    # F2 (on face) → F18 section 1
    with BuildSketch(Plane.XY.offset(2.953037345)):
        with Locations((1.7172626683, 19.5418767357)):
            Rectangle(F2_W, F2_H)
    loft(mode=Mode.SUBTRACT)

    # F2 (on face) → F19 section 0
    with BuildSketch(Plane.XY.offset(2.953037345)):
        with Locations((1.7172626683, 26.7618767357)):
            Rectangle(F2_W, F2_H)
    # F3 (on face) → F19 section 1
    with BuildSketch(Plane(origin=(0, 0, -45.546962655), x_dir=(1, 0, 0), z_dir=(0, 0, -1))):
        with Locations((0.9037374025, -26.7673850632)):
            Rectangle(F3_W, F3_H)
    loft(mode=Mode.SUBTRACT)

    # F3 (on face) → F20 section 0
    with BuildSketch(Plane(origin=(0, 0, -45.546962655), x_dir=(1, 0, 0), z_dir=(0, 0, -1))):
        with Locations((0.9037374025, -33.9873850632)):
            Rectangle(F3_W, F3_H)
    # F2 (on face) → F20 section 1
    with BuildSketch(Plane.XY.offset(2.953037345)):
        with Locations((1.7172626683, 33.9818767357)):
            Rectangle(F2_W, F2_H)
    loft(mode=Mode.SUBTRACT)

    # F2 (on face) → F21 section 0
    with BuildSketch(Plane.XY.offset(2.953037345)):
        with Locations((1.7172626683, 41.2018767357)):
            Rectangle(F2_W, F2_H)
    # F3 (on face) → F21 section 1
    with BuildSketch(Plane(origin=(0, 0, -45.546962655), x_dir=(1, 0, 0), z_dir=(0, 0, -1))):
        with Locations((0.9037374025, -41.2073850632)):
            Rectangle(F3_W, F3_H)
    loft(mode=Mode.SUBTRACT)

    # F22 (add): a face of the model
    f22_faces = [f1.faces().sort_by_distance(p)[0] for p in [
        (0, 4.7718379647, -21.296962655),
    ]]
    extrude(f22_faces, amount=F22_DEPTH)

    # F23 (cut): a face of the model
    f23_faces = [f1.faces().sort_by_distance(p)[0] for p in [
        (8, 4.7718379647, -21.296962655),
    ]]
    extrude(f23_faces, amount=-F23_DEPTH, mode=Mode.SUBTRACT)

    # F24 (cut): a face of the model
    f24_faces = [f1.faces().sort_by_distance(p)[0] for p in [
        (2.25, 80.4218379647, -21.296962655),
    ]]
    extrude(f24_faces, amount=-F24_DEPTH, mode=Mode.SUBTRACT)


solid = f1.part
